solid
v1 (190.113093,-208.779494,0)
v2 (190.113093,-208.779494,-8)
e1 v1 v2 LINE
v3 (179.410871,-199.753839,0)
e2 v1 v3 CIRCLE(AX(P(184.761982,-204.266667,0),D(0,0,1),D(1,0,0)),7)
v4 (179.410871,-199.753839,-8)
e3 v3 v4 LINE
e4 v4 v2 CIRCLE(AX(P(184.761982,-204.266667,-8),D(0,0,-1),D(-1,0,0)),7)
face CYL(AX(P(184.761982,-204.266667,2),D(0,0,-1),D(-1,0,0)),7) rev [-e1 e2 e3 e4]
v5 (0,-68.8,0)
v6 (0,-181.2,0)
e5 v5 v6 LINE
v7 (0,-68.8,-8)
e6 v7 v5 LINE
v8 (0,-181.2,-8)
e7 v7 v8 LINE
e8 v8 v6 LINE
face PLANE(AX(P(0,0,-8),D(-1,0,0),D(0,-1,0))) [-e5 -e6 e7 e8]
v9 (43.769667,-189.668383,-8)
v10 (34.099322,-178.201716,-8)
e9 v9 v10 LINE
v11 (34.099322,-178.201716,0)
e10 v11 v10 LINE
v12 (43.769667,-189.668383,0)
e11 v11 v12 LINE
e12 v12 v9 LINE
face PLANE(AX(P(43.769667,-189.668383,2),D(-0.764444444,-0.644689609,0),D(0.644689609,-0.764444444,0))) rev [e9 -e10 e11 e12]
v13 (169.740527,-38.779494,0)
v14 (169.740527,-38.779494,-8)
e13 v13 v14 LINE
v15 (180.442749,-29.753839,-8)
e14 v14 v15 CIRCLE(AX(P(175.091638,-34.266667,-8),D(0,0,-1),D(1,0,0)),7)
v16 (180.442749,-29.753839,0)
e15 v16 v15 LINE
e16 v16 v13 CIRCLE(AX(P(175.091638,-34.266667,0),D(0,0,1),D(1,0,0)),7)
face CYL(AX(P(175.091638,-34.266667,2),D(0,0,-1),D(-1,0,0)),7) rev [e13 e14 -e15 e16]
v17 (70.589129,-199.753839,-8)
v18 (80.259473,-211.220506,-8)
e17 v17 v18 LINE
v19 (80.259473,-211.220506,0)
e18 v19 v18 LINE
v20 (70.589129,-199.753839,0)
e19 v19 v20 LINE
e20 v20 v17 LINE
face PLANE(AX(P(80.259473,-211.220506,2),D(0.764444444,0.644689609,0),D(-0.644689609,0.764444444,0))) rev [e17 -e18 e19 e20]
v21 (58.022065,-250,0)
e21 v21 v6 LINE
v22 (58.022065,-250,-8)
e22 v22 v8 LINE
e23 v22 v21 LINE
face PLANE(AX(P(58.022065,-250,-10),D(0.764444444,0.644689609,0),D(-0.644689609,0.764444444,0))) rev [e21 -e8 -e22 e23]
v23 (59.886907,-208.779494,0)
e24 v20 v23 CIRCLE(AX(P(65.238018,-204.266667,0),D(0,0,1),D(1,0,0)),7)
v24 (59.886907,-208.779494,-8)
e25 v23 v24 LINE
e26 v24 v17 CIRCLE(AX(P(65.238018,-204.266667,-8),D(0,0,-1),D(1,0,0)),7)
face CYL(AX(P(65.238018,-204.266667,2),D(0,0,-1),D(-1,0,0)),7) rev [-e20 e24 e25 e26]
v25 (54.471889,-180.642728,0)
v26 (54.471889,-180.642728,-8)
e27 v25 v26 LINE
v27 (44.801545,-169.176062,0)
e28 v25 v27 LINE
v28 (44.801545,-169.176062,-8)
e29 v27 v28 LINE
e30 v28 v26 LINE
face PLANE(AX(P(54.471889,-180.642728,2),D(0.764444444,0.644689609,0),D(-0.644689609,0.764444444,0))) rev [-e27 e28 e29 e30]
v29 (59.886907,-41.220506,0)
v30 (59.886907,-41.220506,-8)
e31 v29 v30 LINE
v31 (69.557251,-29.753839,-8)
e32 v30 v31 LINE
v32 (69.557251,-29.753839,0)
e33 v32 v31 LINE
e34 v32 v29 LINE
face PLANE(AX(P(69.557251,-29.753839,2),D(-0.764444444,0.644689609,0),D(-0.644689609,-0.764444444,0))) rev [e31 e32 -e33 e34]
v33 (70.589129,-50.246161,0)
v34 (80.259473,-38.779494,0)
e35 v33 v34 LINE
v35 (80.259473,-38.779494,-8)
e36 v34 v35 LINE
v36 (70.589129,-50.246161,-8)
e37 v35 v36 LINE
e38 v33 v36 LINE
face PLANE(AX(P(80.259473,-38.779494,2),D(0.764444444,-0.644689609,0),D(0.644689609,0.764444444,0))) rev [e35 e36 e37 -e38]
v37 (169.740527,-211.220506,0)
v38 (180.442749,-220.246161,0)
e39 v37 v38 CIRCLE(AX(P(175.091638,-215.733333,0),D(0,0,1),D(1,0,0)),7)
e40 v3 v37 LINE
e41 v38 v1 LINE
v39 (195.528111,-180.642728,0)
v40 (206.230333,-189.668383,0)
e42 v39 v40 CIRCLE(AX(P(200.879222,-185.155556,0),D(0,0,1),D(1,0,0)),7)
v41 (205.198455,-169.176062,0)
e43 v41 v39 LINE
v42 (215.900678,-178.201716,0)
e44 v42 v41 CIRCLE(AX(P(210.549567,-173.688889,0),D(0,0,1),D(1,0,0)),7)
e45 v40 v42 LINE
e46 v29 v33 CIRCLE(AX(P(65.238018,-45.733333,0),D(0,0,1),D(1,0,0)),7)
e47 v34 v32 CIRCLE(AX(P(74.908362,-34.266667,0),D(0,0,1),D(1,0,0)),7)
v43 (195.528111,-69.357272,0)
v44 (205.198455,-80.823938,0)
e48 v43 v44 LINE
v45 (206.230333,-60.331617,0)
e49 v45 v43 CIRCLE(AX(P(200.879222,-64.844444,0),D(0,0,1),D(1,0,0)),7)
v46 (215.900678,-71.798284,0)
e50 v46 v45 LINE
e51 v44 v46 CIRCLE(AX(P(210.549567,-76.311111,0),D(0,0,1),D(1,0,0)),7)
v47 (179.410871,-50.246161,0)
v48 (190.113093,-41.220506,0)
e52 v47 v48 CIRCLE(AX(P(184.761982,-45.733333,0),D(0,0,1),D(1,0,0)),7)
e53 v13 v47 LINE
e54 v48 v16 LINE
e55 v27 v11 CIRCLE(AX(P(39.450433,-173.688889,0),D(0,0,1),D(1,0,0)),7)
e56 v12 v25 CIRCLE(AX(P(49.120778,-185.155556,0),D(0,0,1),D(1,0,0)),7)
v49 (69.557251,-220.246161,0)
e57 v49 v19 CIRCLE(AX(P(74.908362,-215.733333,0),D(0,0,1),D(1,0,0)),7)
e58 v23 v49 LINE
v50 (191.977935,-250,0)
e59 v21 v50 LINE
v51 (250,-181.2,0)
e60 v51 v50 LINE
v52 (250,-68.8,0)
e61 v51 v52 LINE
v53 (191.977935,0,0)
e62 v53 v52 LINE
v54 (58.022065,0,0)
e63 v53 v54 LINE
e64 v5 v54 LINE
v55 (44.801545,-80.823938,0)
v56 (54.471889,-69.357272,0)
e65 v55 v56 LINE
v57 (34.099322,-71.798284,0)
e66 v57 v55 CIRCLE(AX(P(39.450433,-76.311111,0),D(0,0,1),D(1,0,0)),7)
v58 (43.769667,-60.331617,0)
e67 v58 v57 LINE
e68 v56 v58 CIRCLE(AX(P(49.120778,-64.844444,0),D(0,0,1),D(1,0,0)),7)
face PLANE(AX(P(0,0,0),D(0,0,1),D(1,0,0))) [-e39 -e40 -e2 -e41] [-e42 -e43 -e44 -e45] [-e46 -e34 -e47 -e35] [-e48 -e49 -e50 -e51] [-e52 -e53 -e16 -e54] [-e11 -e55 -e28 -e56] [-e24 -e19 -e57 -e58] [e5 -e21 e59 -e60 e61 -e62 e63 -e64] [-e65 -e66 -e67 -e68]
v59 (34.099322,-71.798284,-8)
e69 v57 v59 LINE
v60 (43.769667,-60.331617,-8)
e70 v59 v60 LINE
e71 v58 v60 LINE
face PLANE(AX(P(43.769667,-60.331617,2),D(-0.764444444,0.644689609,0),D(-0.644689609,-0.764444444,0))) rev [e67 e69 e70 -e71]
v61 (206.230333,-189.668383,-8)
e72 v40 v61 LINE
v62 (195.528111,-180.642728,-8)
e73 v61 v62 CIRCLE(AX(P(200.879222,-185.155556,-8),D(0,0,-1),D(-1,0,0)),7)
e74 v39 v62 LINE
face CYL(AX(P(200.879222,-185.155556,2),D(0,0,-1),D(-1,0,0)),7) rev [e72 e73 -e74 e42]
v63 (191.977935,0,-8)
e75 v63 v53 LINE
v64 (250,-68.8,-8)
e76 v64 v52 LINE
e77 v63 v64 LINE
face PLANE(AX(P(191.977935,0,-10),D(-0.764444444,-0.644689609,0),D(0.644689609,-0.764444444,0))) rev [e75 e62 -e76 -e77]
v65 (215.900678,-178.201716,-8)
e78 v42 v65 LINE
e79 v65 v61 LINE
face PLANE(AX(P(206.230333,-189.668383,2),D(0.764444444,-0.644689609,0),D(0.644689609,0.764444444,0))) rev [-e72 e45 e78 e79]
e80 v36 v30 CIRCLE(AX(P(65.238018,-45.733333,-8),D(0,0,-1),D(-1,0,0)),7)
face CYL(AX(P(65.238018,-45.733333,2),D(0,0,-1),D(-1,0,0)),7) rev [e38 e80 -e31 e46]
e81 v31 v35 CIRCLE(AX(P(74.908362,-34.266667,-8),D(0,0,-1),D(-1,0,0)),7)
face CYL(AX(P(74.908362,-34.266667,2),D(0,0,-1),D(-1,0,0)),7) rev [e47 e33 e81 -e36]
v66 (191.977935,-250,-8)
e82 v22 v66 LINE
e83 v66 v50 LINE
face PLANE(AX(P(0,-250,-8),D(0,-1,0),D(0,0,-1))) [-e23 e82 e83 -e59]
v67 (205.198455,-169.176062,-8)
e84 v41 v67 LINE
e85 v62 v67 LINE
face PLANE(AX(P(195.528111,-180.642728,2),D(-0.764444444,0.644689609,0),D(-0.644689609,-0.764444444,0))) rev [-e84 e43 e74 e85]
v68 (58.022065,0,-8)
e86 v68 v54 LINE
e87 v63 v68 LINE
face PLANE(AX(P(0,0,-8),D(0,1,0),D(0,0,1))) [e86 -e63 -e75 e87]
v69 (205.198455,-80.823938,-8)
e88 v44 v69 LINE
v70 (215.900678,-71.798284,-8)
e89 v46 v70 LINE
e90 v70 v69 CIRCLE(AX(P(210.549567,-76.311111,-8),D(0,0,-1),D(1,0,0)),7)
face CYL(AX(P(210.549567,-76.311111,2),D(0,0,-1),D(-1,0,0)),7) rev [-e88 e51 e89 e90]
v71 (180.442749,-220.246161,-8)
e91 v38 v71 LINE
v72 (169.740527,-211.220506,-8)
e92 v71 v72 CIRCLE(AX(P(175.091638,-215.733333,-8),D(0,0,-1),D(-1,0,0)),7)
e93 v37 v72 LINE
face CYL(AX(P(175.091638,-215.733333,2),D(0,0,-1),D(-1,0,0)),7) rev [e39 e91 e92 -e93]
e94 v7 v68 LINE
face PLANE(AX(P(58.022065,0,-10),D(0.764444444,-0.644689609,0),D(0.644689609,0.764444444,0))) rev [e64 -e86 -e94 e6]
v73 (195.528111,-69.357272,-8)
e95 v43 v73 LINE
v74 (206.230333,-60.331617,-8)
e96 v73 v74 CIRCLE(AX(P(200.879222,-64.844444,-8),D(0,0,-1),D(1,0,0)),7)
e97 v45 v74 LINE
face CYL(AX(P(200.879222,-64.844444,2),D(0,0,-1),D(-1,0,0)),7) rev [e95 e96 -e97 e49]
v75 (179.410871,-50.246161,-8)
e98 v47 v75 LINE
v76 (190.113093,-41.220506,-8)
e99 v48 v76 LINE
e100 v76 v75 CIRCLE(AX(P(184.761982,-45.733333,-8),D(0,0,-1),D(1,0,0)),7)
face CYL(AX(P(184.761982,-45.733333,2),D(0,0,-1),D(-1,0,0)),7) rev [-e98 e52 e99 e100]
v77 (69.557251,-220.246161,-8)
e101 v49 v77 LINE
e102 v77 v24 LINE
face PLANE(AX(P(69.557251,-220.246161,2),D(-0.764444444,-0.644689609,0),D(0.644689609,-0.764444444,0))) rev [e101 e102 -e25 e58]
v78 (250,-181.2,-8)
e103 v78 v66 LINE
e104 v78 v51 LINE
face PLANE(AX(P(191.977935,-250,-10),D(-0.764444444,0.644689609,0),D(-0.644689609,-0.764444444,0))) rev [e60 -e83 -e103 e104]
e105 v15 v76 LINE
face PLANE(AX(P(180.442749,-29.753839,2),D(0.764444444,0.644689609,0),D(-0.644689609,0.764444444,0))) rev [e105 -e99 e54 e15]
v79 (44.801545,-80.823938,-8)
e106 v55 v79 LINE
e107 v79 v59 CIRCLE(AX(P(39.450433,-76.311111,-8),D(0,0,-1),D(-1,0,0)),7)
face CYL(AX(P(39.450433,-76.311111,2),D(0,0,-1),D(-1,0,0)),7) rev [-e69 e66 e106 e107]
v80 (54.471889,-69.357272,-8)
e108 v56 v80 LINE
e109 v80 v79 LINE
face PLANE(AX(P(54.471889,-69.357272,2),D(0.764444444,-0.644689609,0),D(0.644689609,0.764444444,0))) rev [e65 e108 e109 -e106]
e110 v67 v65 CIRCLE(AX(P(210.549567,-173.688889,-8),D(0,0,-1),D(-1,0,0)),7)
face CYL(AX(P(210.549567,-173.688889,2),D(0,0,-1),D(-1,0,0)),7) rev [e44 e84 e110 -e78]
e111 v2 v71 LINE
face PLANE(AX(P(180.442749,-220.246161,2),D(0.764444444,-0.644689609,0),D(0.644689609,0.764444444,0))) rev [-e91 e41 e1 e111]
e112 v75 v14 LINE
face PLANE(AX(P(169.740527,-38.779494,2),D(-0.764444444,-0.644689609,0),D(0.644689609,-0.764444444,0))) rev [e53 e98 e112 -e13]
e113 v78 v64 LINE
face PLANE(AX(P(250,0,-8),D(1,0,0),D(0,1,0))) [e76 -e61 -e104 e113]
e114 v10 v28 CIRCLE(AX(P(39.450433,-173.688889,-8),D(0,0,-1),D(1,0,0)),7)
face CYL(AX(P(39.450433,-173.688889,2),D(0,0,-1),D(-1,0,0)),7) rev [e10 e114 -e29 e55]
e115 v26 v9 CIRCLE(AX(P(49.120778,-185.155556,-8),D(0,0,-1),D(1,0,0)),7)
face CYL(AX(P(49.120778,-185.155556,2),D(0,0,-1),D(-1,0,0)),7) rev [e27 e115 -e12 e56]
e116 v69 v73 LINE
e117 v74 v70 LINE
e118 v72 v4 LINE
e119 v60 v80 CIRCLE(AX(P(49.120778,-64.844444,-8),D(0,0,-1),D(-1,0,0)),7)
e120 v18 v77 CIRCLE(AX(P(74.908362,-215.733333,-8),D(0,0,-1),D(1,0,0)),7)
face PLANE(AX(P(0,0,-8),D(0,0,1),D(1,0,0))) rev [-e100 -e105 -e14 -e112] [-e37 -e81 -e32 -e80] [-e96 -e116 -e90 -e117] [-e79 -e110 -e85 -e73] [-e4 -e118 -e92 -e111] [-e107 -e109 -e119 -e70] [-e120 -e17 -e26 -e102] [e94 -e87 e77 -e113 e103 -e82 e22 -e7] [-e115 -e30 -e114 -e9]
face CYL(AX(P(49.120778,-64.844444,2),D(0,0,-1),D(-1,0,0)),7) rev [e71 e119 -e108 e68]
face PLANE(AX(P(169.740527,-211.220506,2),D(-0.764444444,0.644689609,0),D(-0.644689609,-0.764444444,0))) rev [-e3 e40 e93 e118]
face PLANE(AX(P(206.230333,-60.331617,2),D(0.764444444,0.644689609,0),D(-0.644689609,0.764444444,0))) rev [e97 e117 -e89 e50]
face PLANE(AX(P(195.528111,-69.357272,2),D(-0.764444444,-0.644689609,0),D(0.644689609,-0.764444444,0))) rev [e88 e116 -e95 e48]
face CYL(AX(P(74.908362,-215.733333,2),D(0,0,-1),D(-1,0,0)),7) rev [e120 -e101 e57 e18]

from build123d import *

# Parameters (mm, degrees)
SKETCH_1_W             = 250
SKETCH_1_H             = 250
SM_BASE_FLANGE_1_DEPTH = 8
CUT_EXTRUDE_1_DEPTH    = 10
CUT_EXTRUDE_2_DEPTH    = 10


# Sheet-metal steps are written as plain solids
with BuildPart() as part:
    # Sketch 1 → Базовая кромка1 (new body)
    with BuildSketch(Plane.XY):
        with Locations((125, -125)):
            Rectangle(SKETCH_1_W, SKETCH_1_H)
    extrude(amount=-SM_BASE_FLANGE_1_DEPTH)

    # Sketch 2 → Вырез-Вытянуть1 (cut)
    with BuildSketch(Plane.XY):
        Polygon((58.022064768, 0), (0, -68.8), (0, 0), align=None)
        Polygon((250, 0), (191.977935232, 0), (250, -68.8), align=None)
        Polygon((191.977935232, -250), (250, -181.2), (250, -250), align=None)
        Polygon((0, -250), (58.022064768, -250), (0, -181.2), align=None)
    extrude(amount=-CUT_EXTRUDE_1_DEPTH, mode=Mode.SUBTRACT)

    # Эскиз3 → Вырез-Вытянуть2 (cut)
    with BuildSketch(Plane(origin=(0, 0, -8), x_dir=(-1, 0, 0), z_dir=(0, 0, -1))):
        with BuildLine():
            Line((-69.557250856, -29.753839407), (-59.886906728, -41.220506074))
            ThreePointArc((-59.886906728, -41.220506074), (-60.725190579, -51.084444444), (-70.58912895, -50.246160593))
            Line((-70.58912895, -50.246160593), (-80.259473078, -38.779493926))
            ThreePointArc((-80.259473078, -38.779493926), (-79.421189227, -28.915555556), (-69.557250856, -29.753839407))
        make_face()
        with BuildLine():
            Line((-43.769666514, -60.331617185), (-34.099322386, -71.798283851))
            ThreePointArc((-34.099322386, -71.798283851), (-34.937606238, -81.662222222), (-44.801544609, -80.823938371))
            Line((-44.801544609, -80.823938371), (-54.471888737, -69.357271704))
            ThreePointArc((-54.471888737, -69.357271704), (-53.633604885, -59.493333333), (-43.769666514, -60.331617185))
        make_face()
        with BuildLine():
            Line((-180.442749144, -29.753839407), (-190.113093272, -41.220506074))
            ThreePointArc((-190.113093272, -41.220506074), (-189.274809421, -51.084444444), (-179.41087105, -50.246160593))
            Line((-179.41087105, -50.246160593), (-169.740526922, -38.779493926))
            ThreePointArc((-169.740526922, -38.779493926), (-170.578810773, -28.915555556), (-180.442749144, -29.753839407))
        make_face()
        with BuildLine():
            Line((-206.230333486, -60.331617185), (-215.900677614, -71.798283851))
            ThreePointArc((-215.900677614, -71.798283851), (-215.062393762, -81.662222222), (-205.198455391, -80.823938371))
            Line((-205.198455391, -80.823938371), (-195.528111263, -69.357271704))
            ThreePointArc((-195.528111263, -69.357271704), (-196.366395115, -59.493333333), (-206.230333486, -60.331617185))
        make_face()
        with BuildLine():
            Line((-69.557250856, -220.246160593), (-59.886906728, -208.779493926))
            ThreePointArc((-59.886906728, -208.779493926), (-60.725190579, -198.915555556), (-70.58912895, -199.753839407))
            Line((-70.58912895, -199.753839407), (-80.259473078, -211.220506074))
            ThreePointArc((-80.259473078, -211.220506074), (-79.421189227, -221.084444444), (-69.557250856, -220.246160593))
        make_face()
        with BuildLine():
            Line((-43.769666514, -189.668382815), (-34.099322386, -178.201716149))
            ThreePointArc((-34.099322386, -178.201716149), (-34.937606238, -168.337777778), (-44.801544609, -169.176061629))
            Line((-44.801544609, -169.176061629), (-54.471888737, -180.642728296))
            ThreePointArc((-54.471888737, -180.642728296), (-53.633604885, -190.506666667), (-43.769666514, -189.668382815))
        make_face()
        with BuildLine():
            Line((-180.442749144, -220.246160593), (-190.113093272, -208.779493926))
            ThreePointArc((-190.113093272, -208.779493926), (-189.274809421, -198.915555556), (-179.41087105, -199.753839407))
            Line((-179.41087105, -199.753839407), (-169.740526922, -211.220506074))
            ThreePointArc((-169.740526922, -211.220506074), (-170.578810773, -221.084444444), (-180.442749144, -220.246160593))
        make_face()
        with BuildLine():
            Line((-206.230333486, -189.668382815), (-215.900677614, -178.201716149))
            ThreePointArc((-215.900677614, -178.201716149), (-215.062393762, -168.337777778), (-205.198455391, -169.176061629))
            Line((-205.198455391, -169.176061629), (-195.528111263, -180.642728296))
            ThreePointArc((-195.528111263, -180.642728296), (-196.366395115, -190.506666667), (-206.230333486, -189.668382815))
        make_face()
    extrude(amount=-CUT_EXTRUDE_2_DEPTH, mode=Mode.SUBTRACT)


solid = part.part
